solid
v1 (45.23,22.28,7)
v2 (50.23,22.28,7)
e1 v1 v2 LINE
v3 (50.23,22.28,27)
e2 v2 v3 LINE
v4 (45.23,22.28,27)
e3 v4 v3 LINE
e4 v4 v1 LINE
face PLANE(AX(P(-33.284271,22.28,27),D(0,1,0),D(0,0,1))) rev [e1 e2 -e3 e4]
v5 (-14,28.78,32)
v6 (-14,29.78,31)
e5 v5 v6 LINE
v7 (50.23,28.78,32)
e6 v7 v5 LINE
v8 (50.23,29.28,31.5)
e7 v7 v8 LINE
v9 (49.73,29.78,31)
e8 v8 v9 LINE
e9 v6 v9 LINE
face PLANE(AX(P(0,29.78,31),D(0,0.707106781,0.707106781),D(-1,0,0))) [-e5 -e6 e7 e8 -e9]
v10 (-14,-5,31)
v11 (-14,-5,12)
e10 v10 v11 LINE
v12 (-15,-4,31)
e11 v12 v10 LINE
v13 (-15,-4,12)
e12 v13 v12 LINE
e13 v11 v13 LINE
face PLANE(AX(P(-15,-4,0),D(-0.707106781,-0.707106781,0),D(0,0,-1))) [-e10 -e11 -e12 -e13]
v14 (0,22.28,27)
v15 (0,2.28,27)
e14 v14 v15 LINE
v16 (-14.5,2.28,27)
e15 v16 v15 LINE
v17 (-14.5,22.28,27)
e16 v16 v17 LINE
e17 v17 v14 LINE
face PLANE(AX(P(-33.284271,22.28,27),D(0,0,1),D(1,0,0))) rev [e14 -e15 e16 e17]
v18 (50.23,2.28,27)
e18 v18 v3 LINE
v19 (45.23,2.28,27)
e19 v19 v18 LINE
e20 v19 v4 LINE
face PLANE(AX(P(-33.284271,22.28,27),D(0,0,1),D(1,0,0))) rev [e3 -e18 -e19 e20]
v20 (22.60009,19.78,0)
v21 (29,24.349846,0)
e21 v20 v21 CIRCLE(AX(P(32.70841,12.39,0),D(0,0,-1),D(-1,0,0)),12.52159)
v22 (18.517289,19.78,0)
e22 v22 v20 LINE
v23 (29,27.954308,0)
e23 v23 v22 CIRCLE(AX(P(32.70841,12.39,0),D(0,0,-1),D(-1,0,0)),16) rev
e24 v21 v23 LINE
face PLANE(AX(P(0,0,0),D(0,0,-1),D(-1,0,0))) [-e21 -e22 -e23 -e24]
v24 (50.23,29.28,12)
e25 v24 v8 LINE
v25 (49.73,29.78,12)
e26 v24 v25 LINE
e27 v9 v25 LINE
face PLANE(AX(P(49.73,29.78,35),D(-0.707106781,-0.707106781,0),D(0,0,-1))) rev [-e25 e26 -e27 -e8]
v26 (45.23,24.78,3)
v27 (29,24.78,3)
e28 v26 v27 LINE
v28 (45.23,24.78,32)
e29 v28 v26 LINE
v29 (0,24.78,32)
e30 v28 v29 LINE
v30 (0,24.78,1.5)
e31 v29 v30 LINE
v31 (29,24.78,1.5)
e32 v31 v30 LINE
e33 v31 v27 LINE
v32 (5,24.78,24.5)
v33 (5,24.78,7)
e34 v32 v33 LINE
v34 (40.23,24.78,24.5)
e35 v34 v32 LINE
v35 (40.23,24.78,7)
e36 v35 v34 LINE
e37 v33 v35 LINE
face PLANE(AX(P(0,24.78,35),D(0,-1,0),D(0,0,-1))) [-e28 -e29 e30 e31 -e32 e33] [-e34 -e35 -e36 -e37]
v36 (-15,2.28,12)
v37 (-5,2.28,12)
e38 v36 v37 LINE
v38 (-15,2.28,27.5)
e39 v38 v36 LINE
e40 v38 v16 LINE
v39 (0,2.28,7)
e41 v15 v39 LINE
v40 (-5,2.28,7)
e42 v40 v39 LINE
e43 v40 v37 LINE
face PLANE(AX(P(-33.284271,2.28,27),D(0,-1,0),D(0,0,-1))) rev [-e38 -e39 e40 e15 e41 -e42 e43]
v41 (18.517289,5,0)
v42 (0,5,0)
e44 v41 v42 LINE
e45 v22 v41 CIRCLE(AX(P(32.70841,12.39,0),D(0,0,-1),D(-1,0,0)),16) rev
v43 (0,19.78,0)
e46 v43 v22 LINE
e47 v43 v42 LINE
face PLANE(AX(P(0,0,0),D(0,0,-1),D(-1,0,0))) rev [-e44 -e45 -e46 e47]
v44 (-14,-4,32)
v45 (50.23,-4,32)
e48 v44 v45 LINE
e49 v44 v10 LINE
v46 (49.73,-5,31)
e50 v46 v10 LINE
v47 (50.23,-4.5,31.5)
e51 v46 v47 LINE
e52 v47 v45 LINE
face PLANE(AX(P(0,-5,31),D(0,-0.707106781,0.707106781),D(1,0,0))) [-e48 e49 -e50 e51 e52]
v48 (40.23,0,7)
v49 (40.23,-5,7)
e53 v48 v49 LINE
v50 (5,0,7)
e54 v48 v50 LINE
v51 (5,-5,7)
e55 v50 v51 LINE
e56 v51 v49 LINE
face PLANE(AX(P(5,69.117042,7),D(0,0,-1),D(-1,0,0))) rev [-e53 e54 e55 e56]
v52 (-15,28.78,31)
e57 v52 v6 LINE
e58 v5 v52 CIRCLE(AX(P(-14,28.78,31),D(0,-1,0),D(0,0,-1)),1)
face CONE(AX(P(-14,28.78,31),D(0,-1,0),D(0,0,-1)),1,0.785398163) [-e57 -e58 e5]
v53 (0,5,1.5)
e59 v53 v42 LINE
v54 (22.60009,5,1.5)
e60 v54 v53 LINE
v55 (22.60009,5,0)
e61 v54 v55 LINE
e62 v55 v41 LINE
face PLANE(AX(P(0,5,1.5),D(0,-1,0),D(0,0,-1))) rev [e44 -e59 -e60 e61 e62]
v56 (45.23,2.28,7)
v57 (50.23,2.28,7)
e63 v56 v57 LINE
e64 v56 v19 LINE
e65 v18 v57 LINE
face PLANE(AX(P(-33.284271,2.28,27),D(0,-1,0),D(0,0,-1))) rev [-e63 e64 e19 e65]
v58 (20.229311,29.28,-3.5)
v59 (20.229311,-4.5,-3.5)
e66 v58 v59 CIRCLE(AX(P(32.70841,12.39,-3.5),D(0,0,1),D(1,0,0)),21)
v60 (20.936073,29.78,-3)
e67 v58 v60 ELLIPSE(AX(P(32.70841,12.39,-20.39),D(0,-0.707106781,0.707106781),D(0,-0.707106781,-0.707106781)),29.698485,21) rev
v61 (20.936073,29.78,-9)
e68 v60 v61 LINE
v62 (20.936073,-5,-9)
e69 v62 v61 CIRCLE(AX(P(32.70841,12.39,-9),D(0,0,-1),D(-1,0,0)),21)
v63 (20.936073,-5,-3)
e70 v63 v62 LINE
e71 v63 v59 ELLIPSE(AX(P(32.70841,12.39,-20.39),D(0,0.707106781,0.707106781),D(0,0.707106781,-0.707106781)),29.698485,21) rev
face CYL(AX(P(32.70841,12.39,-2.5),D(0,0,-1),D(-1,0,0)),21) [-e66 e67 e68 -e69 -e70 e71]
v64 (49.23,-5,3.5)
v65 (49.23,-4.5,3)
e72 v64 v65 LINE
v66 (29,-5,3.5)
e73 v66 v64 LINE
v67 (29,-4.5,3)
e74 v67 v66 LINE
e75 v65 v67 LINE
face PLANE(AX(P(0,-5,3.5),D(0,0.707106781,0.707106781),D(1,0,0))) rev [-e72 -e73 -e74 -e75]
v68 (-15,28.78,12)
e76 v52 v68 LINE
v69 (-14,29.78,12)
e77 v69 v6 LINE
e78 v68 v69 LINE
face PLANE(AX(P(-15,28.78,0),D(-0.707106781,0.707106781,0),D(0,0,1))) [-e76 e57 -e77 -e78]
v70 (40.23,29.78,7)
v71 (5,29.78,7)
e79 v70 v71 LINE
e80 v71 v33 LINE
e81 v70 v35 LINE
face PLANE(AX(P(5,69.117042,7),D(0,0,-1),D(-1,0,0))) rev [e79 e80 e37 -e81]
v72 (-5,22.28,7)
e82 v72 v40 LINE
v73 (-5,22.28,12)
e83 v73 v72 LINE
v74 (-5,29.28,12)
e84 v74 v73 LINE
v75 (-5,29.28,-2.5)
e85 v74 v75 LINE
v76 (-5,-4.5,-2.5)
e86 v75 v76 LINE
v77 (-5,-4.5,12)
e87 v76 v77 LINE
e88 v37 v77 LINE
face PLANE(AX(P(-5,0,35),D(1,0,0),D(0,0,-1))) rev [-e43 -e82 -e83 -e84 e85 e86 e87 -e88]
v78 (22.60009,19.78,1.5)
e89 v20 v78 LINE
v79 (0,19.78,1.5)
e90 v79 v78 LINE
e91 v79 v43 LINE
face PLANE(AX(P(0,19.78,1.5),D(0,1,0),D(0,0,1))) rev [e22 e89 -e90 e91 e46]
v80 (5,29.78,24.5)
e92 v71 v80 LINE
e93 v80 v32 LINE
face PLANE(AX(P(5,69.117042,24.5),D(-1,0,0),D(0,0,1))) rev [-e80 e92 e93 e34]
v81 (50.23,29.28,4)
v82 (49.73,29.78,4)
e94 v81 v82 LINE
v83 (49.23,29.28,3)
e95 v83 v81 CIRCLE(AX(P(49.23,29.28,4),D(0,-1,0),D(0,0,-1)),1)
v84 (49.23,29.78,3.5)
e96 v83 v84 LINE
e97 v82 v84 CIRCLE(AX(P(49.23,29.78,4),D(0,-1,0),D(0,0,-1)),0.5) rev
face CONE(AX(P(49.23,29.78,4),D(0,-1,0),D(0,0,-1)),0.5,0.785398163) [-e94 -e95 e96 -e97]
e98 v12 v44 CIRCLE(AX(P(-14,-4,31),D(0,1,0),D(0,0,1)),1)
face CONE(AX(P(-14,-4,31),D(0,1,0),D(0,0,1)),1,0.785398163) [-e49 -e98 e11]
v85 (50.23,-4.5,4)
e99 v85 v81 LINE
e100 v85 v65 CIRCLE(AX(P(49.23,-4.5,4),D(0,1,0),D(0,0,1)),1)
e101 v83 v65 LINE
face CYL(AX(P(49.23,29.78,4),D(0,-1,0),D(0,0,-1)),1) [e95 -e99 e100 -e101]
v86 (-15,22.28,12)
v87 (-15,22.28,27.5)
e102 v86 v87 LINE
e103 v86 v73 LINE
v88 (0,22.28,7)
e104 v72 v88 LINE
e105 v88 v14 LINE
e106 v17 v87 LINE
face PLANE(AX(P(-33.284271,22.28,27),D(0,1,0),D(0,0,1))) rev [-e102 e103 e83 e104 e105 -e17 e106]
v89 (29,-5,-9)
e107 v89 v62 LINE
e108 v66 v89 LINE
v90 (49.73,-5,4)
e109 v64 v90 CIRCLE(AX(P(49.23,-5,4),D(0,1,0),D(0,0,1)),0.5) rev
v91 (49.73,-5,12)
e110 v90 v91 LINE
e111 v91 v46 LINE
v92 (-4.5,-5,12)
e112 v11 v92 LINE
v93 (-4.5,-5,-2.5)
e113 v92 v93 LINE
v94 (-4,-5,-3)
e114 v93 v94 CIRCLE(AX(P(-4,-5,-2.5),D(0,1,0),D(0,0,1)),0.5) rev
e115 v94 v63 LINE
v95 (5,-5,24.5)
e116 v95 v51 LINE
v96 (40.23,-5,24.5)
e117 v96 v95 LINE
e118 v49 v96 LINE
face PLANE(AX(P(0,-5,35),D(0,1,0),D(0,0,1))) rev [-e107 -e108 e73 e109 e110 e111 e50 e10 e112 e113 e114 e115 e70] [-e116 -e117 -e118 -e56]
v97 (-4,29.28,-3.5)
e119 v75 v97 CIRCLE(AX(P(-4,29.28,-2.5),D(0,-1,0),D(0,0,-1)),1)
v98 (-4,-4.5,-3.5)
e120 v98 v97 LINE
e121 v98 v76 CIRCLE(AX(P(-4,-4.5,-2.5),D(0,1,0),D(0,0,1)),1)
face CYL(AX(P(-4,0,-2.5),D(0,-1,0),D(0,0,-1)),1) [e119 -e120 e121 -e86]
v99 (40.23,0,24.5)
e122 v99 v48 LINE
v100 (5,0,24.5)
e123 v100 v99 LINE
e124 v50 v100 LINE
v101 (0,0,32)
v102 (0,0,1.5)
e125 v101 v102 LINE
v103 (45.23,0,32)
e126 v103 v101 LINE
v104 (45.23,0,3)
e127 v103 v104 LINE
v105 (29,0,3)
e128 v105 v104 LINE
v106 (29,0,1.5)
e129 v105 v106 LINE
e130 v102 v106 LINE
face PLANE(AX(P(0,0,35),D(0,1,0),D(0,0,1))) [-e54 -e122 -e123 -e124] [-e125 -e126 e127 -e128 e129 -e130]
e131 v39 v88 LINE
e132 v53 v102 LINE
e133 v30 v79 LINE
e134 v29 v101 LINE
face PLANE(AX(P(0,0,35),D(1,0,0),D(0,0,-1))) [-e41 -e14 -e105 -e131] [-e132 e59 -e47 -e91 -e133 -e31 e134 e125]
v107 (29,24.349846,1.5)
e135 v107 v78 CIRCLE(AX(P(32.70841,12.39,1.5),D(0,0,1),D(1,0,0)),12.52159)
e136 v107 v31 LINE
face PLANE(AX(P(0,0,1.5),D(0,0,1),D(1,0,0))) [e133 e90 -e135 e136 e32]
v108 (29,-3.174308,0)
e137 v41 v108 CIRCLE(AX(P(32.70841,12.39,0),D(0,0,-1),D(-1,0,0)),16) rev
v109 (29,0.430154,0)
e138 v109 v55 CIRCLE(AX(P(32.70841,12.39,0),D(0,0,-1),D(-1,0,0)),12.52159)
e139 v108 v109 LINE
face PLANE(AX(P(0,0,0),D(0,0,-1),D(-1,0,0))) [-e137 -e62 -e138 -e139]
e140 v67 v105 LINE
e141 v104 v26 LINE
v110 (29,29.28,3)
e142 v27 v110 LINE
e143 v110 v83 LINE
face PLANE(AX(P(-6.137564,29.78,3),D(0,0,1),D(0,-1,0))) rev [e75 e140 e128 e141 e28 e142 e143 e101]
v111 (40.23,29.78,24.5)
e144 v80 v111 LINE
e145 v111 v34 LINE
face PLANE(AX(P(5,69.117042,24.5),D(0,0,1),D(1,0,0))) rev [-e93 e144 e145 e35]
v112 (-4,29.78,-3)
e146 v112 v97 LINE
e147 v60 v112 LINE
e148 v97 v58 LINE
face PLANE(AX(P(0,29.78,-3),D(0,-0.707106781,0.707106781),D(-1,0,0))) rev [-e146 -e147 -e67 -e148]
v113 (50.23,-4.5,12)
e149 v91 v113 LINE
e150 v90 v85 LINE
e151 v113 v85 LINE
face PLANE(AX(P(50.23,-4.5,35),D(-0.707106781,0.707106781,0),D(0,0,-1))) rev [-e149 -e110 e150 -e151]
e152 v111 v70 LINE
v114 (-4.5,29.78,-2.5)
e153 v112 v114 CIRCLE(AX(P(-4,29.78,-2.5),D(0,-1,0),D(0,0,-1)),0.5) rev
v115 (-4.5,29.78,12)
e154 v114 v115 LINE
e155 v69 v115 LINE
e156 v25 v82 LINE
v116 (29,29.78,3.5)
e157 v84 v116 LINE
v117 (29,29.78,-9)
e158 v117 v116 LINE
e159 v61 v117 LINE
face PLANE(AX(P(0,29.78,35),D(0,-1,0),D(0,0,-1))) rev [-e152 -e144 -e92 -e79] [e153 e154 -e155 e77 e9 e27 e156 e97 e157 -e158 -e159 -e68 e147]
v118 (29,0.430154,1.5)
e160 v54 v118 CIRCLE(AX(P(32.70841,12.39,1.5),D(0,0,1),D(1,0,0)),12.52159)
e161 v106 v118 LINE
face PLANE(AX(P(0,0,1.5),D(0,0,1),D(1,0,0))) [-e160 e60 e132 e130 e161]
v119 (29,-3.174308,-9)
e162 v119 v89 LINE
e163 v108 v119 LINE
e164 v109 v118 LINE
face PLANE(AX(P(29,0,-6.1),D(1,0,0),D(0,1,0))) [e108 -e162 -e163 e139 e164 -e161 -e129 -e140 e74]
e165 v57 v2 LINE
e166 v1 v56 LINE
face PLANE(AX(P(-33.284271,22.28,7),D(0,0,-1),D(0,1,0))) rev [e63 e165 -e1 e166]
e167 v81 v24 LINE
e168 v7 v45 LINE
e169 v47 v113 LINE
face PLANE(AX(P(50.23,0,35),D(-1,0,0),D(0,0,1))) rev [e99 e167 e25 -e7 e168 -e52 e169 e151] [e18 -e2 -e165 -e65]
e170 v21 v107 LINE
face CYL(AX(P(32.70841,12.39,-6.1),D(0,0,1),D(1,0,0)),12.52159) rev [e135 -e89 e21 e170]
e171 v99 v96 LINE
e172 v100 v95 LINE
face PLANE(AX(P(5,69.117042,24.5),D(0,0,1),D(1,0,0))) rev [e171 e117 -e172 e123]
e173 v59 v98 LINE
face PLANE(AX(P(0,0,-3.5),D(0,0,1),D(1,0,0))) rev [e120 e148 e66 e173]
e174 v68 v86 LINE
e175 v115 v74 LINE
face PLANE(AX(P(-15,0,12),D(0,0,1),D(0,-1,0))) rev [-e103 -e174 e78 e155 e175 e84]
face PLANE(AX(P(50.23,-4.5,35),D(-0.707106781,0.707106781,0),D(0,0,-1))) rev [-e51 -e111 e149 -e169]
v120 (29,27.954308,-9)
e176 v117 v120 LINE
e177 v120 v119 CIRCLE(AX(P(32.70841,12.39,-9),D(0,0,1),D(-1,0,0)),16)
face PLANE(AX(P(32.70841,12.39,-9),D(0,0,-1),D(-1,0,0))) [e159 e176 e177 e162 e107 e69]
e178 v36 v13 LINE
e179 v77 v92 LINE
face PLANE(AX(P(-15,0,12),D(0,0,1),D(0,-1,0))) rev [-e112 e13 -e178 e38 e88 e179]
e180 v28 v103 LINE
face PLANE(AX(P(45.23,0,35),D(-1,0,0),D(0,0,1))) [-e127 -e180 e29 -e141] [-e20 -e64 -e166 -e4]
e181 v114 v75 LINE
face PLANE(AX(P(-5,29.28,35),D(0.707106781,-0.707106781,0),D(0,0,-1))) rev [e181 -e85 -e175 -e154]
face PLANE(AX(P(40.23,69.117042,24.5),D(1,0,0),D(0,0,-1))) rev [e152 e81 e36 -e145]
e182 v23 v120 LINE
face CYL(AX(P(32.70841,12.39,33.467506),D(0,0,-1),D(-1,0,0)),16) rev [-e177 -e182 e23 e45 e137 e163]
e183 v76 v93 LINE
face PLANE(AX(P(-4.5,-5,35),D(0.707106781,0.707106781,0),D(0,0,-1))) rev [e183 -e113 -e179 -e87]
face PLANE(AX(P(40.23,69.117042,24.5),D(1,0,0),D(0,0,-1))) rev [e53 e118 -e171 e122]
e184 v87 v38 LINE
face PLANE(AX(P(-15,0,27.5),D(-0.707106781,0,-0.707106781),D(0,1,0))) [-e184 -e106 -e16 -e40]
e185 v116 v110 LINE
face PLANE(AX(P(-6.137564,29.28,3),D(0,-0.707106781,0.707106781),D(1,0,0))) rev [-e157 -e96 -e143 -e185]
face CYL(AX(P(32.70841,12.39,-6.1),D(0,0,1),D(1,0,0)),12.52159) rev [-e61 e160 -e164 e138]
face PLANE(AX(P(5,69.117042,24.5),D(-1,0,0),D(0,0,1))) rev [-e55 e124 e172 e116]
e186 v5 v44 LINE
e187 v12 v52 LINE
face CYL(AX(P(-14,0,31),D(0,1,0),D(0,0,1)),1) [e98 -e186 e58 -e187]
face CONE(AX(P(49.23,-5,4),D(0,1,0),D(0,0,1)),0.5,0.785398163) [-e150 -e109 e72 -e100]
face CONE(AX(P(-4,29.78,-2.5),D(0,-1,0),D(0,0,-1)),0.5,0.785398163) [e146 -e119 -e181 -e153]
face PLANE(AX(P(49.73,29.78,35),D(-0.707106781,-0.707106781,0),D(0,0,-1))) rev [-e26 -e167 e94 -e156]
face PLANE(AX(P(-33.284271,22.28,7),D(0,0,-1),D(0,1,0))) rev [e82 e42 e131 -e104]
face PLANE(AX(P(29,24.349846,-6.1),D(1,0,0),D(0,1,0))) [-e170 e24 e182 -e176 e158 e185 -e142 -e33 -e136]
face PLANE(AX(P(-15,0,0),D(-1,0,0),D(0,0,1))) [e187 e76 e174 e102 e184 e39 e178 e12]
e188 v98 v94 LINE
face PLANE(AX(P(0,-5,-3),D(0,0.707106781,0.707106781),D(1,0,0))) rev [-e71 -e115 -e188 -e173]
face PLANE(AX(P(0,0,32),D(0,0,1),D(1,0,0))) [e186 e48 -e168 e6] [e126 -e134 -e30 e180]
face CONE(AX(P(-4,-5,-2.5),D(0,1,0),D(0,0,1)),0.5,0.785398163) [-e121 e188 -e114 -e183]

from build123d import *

# Parameters (mm, degrees)
SKETCH_1_W              = 45.23
SKETCH_1_H              = 24.78
EXTRUDE_1_DEPTH         = 35
CUT_EXTRUDE_1_DEPTH     = 3
SKETCH_5_W              = 1.897849624
SKETCH_5_H              = 24.78
CUT_EXTRUDE_3_DEPTH     = 3
EXTRUDE_2_DEPTH         = 17.9
EXTRUDE_2_DEPTH_BACK    = 18.6
EXTRUDE_2_START         = 17.5
SKETCH_3_R              = 3
SKETCH_4_W              = 30.897849624
SKETCH_4_H              = 5
CUT_EXTRUDE_2_DEPTH     = 1.5
SKETCH_6_W              = 10
SKETCH_6_H              = 18
CUT_EXTRUDE_4_DEPTH     = 1.5
SHELL_START             = -5
SHELL_12_DEPTH          = 5
SHELL_START_2           = 45.23
SHELL_12_2_OUTLINE_W    = 34.78
SHELL_12_2_OUTLINE_H    = 39
SHELL_12_2_DEPTH        = 5
SHELL_12_3_OUTLINE_W    = 34.78
SHELL_12_3_OUTLINE_H    = 1.5
SHELL_12_3_DEPTH        = 34
SHELL_12_4_OUTLINE_W    = 28
SHELL_12_4_OUTLINE_H    = 1.5
SHELL_12_4_DEPTH        = 20
SHELL_12_5_OUTLINE_W    = 45.23
SHELL_12_5_OUTLINE_H    = 39
SHELL_12_5_DEPTH        = 34.78
SHELL_START_3           = 3
SHELL_12_6_OUTLINE_W    = 45.23
SHELL_12_6_OUTLINE_H    = 24.78
SHELL_12_6_DEPTH        = 29
SHELL_START_4           = 1.5
SHELL_12_7_OUTLINE_R    = 3
SHELL_12_7_DEPTH        = 32
SHELL_12_8_OUTLINE_R    = 3
SHELL_12_8_OUTLINE_W    = 10
SHELL_12_8_OUTLINE_H    = 14.78
SHELL_12_8_DEPTH        = 35
SHELL_12_9_OUTLINE_W    = 5
SHELL_12_9_OUTLINE_H    = 14.78
SHELL_12_9_DEPTH        = 1.5
SHELL_START_5           = 33.5
SHELL_12_10_OUTLINE_W   = 10
SHELL_12_10_OUTLINE_H   = 1.585
SHELL_12_10_OUTLINE_H_2 = 1.635
SHELL_12_10_DEPTH       = 1.5
SHELL_START_6           = -1.1
SHELL_12_11_OUTLINE_R   = 3
SHELL_12_11_DEPTH       = 36.5
SHELL_START_7           = 37
SHELL_12_12_OUTLINE_R   = 8
SHELL_12_12_DEPTH       = 3.4
SHELL_START_8           = -6.1
SHELL_12_13_OUTLINE_R   = 8
SHELL_12_13_DEPTH       = 4.1
CUT_EXTRUDE_7_DEPTH     = 70.724538722
CUT_EXTRUDE_8_DEPTH     = 70.724538722
CUT_EXTRUDE_9_REACH     = 70.969
SKETCH_14_W             = 35.23
SKETCH_14_H             = 17.5
CUT_EXTRUDE_10_REACH    = 72.436
SKETCH_15_W             = 20
SKETCH_15_H             = 20
SKETCH_16_W             = 5
SKETCH_16_H             = 1.5
CUT_EXTRUDE_11_DEPTH    = 34.78
CUT_EXTRUDE_12_REACH    = 72.436
SKETCH_17_W             = 5
SKETCH_17_H             = 34.78
SKETCH_19_W             = 34
SKETCH_19_H             = 1.5
CUT_EXTRUDE_14_DEPTH    = 24.78
FILLET_3_R              = 1
EXTRUDE_3_DEPTH         = 10
EXTRUDE_4_DEPTH         = 10
FILLET_4_R              = 1
CHAMFER_3_SIZE          = 1
CHAMFER_4_SIZE          = 0.5
CUT_EXTRUDE_15_DEPTH    = 10
CHAMFER_5_SIZE          = 0.5
CUT_EXTRUDE_START       = -3.5
CUT_EXTRUDE_16_DEPTH    = 3.5
EXTRUDE_5_DEPTH         = 5.5
EXTRUDE_5_DEPTH_BACK    = 1


with BuildPart() as part:
    # 草图1 → 凸台-拉伸1 (new body)
    with BuildSketch(Plane.XY):
        with Locations((22.615, 12.39)):
            Rectangle(SKETCH_1_W, SKETCH_1_H)
    extrude(amount=EXTRUDE_1_DEPTH)

    # 草图2 → 切除-拉伸1 (cut)
    with BuildSketch(Plane.XY):
        with BuildLine():
            Line((45.23, 24.78), (30.897849624, 24.78))
            ThreePointArc((30.897849624, 24.78), (20.186819111, 12.39), (30.897849624, 0))
            Line((30.897849624, 0), (45.23, 0))
            Line((45.23, 0), (45.23, 24.78))
        make_face()
    cut_extrude_1 = extrude(amount=CUT_EXTRUDE_1_DEPTH, mode=Mode.SUBTRACT)

    # 草图5 → 切除-拉伸3 (cut)
    with BuildSketch(Plane.XY):
        with Locations((29.948924812, 12.39)):
            Rectangle(SKETCH_5_W, SKETCH_5_H)
    cut_extrude_3 = extrude(amount=CUT_EXTRUDE_3_DEPTH, mode=Mode.SUBTRACT)

    # 镜向1: 切除-拉伸1, 切除-拉伸3 across plane
    add(cut_extrude_1.mirror(Plane.XY.offset(17.5)), mode=Mode.SUBTRACT)
    add(cut_extrude_3.mirror(Plane.XY.offset(17.5)), mode=Mode.SUBTRACT)

    # 草图3 → 凸台-拉伸2 (add, two sides: drawn at the far end of the back side and taken through both)
    with BuildSketch(Plane.XY.offset(EXTRUDE_2_START - EXTRUDE_2_DEPTH_BACK)):
        with Locations((32.708409555, 12.39)):
            Circle(SKETCH_3_R)
    extrude(amount=EXTRUDE_2_DEPTH + EXTRUDE_2_DEPTH_BACK)

    # 草图4 → 切除-拉伸2 (cut)
    with BuildSketch(Plane.XY):
        with Locations((15.448924812, 22.28)):
            Rectangle(SKETCH_4_W, SKETCH_4_H)
        with Locations((15.448924812, 2.5)):
            Rectangle(SKETCH_4_W, SKETCH_4_H)
    extrude(amount=CUT_EXTRUDE_2_DEPTH, mode=Mode.SUBTRACT)

    # 草图6 → 切除-拉伸4 (cut)
    with BuildSketch(Plane.XY.offset(35)):
        with BuildLine():
            Line((29, 24.78), (0, 24.78))
            Line((0, 24.78), (0, 0))
            Line((0, 0), (29, 0))
            Line((29, 0), (29, 0.430153603))
            ThreePointArc((29, 0.430153603), (20.186819111, 12.39), (29, 24.349846397))
            Line((29, 24.349846397), (29, 24.78))
        make_face()
        with Locations((10, 12.365)):
            Rectangle(SKETCH_6_W, SKETCH_6_H, mode=Mode.SUBTRACT)
    extrude(amount=-CUT_EXTRUDE_4_DEPTH, mode=Mode.SUBTRACT)

    # 抽壳12: read off the stored shape, not the designer's step
    # 抽壳12 outline → 抽壳12 (add)
    with BuildSketch(Plane.YZ.offset(SHELL_START)):
        Polygon((0, -3.5), (0, -5), (24.78, -5), (24.78, -3.5), (29.78, -3.5), (29.78, 38.5), (-5, 38.5), (-5, -3.5), align=None)
    extrude(amount=SHELL_12_DEPTH)

    # Shell 12 2 outline → Shell 12 2 (add)
    with BuildSketch(Plane.YZ.offset(SHELL_START_2)):
        with Locations((12.39, 17.5)):
            Rectangle(SHELL_12_2_OUTLINE_W, SHELL_12_2_OUTLINE_H)
    extrude(amount=SHELL_12_2_DEPTH)

    # Shell 12 3 outline → Shell 12 3 (add)
    with BuildSketch(Plane.YZ):
        Polygon((0, -3.5), (0, -5), (24.78, -5), (24.78, -3.5), (29.78, -3.5), (29.78, -2), (-5, -2), (-5, -3.5), align=None)
        with Locations((12.39, 37.75)):
            Rectangle(SHELL_12_3_OUTLINE_W, SHELL_12_3_OUTLINE_H)
    extrude(amount=SHELL_12_3_DEPTH)

    # Shell 12 4 outline → Shell 12 4 (add)
    with BuildSketch(Plane.YZ):
        with Locations((12.365, 39.25)):
            Rectangle(SHELL_12_4_OUTLINE_W, SHELL_12_4_OUTLINE_H)
    extrude(amount=SHELL_12_4_DEPTH)

    # Shell 12 5 outline → Shell 12 5 (add)
    with BuildSketch(Plane(origin=(0, 0, 0), x_dir=(1, 0, 0), z_dir=(0, 1, 0)).offset(SHELL_START)):
        with Locations((22.615, -17.5)):
            Rectangle(SHELL_12_5_OUTLINE_W, SHELL_12_5_OUTLINE_H)
    extrude(amount=SHELL_12_5_DEPTH)

    # Shell 12 6 outline → Shell 12 6 (cut)
    with BuildSketch(Plane.XY.offset(SHELL_START_3)):
        with Locations((22.615, 12.39)):
            Rectangle(SHELL_12_6_OUTLINE_W, SHELL_12_6_OUTLINE_H)
    extrude(amount=SHELL_12_6_DEPTH, mode=Mode.SUBTRACT)

    # Shell 12 7 outline → Shell 12 7 (cut)
    with BuildSketch(Plane.XY.offset(SHELL_START_4)):
        with Locations((32.708409555, 12.39)):
            Circle(SHELL_12_7_OUTLINE_R)
        with BuildLine():
            Line((29, 24.349846397), (29, 24.78))
            Line((29, 24.78), (0, 24.78))
            Line((0, 24.78), (0, 0))
            Line((0, 0), (29, 0))
            Line((29, 0), (29, 0.430153603))
            ThreePointArc((29, 0.430153603), (20.186819111, 12.39), (29, 24.349846397))
        make_face()
    extrude(amount=SHELL_12_7_DEPTH, mode=Mode.SUBTRACT)

    # Shell 12 8 outline → Shell 12 8 (cut)
    with BuildSketch(Plane.XY):
        with Locations((32.708409555, 12.39)):
            Circle(SHELL_12_8_OUTLINE_R)
        with Locations((10, 12.39)):
            Rectangle(SHELL_12_8_OUTLINE_W, SHELL_12_8_OUTLINE_H)
    extrude(amount=SHELL_12_8_DEPTH, mode=Mode.SUBTRACT)

    # Shell 12 9 outline → Shell 12 9 (cut)
    with BuildSketch(Plane.XY):
        with Locations((2.5, 12.39)):
            Rectangle(SHELL_12_9_OUTLINE_W, SHELL_12_9_OUTLINE_H)
        with BuildLine():
            ThreePointArc((22.60008985, 5), (20.186819111, 12.39), (22.60008985, 19.78))
            Line((22.60008985, 19.78), (15, 19.78))
            Line((15, 19.78), (15, 5))
            Line((15, 5), (22.60008985, 5))
        make_face()
    extrude(amount=SHELL_12_9_DEPTH, mode=Mode.SUBTRACT)

    # Shell 12 10 outline → Shell 12 10 (cut)
    with BuildSketch(Plane.XY.offset(SHELL_START_5)):
        with Locations((10, 20.5725)):
            Rectangle(SHELL_12_10_OUTLINE_W, SHELL_12_10_OUTLINE_H)
        with Locations((10, 4.1825)):
            Rectangle(SHELL_12_10_OUTLINE_W, SHELL_12_10_OUTLINE_H_2)
    extrude(amount=SHELL_12_10_DEPTH, mode=Mode.SUBTRACT)

    # Shell 12 11 outline → Shell 12 11 (cut)
    with BuildSketch(Plane.XY.offset(SHELL_START_6)):
        with Locations((32.708409555, 12.39)):
            Circle(SHELL_12_11_OUTLINE_R)
    extrude(amount=SHELL_12_11_DEPTH, mode=Mode.SUBTRACT)

    # Shell 12 12 outline → Shell 12 12 (add)
    with BuildSketch(Plane.XY.offset(SHELL_START_7)):
        with Locations((32.708409555, 12.39)):
            Circle(SHELL_12_12_OUTLINE_R)
    extrude(amount=SHELL_12_12_DEPTH)

    # Shell 12 13 outline → Shell 12 13 (add)
    with BuildSketch(Plane.XY.offset(SHELL_START_8)):
        with Locations((32.708409555, 12.39)):
            Circle(SHELL_12_13_OUTLINE_R)
    extrude(amount=SHELL_12_13_DEPTH)

    # 草图12 → 切除-拉伸7 (cut, through all)
    with BuildSketch(Plane(origin=(0, 0, 32), x_dir=(-1, 0, 0), z_dir=(0, 0, -1))):
        Polygon((-50.23, 29.78), (-50.23, -5), (-34, -5), (5, -5), (5, 29.78), (-34, 29.78), align=None)
    extrude(amount=-CUT_EXTRUDE_7_DEPTH, mode=Mode.SUBTRACT)

    # 草图13 → 切除-拉伸8 (cut, through all)
    with BuildSketch(Plane(origin=(0, 0, 32), x_dir=(-1, 0, 0), z_dir=(0, 0, -1))):
        with BuildLine():
            Line((-45.23, 0), (-29, 0))
            Line((-29, 0), (-29, 0.430153603))
            ThreePointArc((-29, 0.430153603), (-20.186819111, 12.39), (-29, 24.349846397))
            Line((-29, 24.349846397), (-29, 24.78))
            Line((-29, 24.78), (-45.23, 24.78))
            Line((-45.23, 24.78), (-45.23, 0))
        make_face()
    extrude(amount=CUT_EXTRUDE_8_DEPTH, mode=Mode.SUBTRACT)

    # 切除-拉伸9: up to this face of the body (flat: up to its plane)
    cut_extrude_9_end = Plane(part.part.faces().sort_by_distance((22.369830038, 29.78, 14.463737915))[0])
    # 草图14 → 切除-拉伸9 (cut, up to the picked face)
    with BuildSketch(Plane.XZ.offset(5), mode=Mode.PRIVATE) as cut_extrude_9_sk1:
        with Locations((22.615, 15.75)):
            Rectangle(SKETCH_14_W, SKETCH_14_H)
    cut_extrude_9_tool1 = split(extrude(cut_extrude_9_sk1.sketch, amount=-CUT_EXTRUDE_9_REACH, mode=Mode.PRIVATE), bisect_by=cut_extrude_9_end, keep=Keep.BOTH, mode=Mode.PRIVATE)
    add(cut_extrude_9_tool1.solids().sort_by(Axis((22.615, -5, 15.75), (0, 1, 0)))[0], mode=Mode.SUBTRACT)

    # 切除-拉伸10: up to this face of the body (flat: up to its plane)
    cut_extrude_10_end = Plane(part.part.faces().sort_by_distance((-5, 12.39, 13.709339078))[0])
    # 草图15 → 切除-拉伸10 (cut, up to the picked face)
    with BuildSketch(Plane(origin=(50.23, 0, 0), x_dir=(0, 0, -1), z_dir=(1, 0, 0)), mode=Mode.PRIVATE) as cut_extrude_10_sk1:
        with Locations((-17, 12.28)):
            Rectangle(SKETCH_15_W, SKETCH_15_H)
    cut_extrude_10_tool1 = split(extrude(cut_extrude_10_sk1.sketch, amount=-CUT_EXTRUDE_10_REACH, mode=Mode.PRIVATE), bisect_by=cut_extrude_10_end, keep=Keep.BOTH, mode=Mode.PRIVATE)
    add(cut_extrude_10_tool1.solids().sort_by(Axis((50.23, 12.28, 17), (-1, 0, 0)))[0], mode=Mode.SUBTRACT)

    # 草图16 → 切除-拉伸11 (cut)
    with BuildSketch(Plane.XZ.offset(5)):
        with Locations((31.5, -2.75)):
            Rectangle(SKETCH_16_W, SKETCH_16_H)
    extrude(amount=-CUT_EXTRUDE_11_DEPTH, mode=Mode.SUBTRACT)

    # 切除-拉伸12: up to this face of the body (flat: up to its plane)
    cut_extrude_12_end = Plane(part.part.faces().sort_by_distance((29, -1.762689237, -2.47843834))[0])
    # 草图17 → 切除-拉伸12 (cut, up to the picked face)
    with BuildSketch(Plane(origin=(50.23, 0, 0), x_dir=(0, 0, -1), z_dir=(1, 0, 0)), mode=Mode.PRIVATE) as cut_extrude_12_sk1:
        with Locations((-0.5, 12.39)):
            Rectangle(SKETCH_17_W, SKETCH_17_H)
    cut_extrude_12_tool1 = split(extrude(cut_extrude_12_sk1.sketch, amount=-CUT_EXTRUDE_12_REACH, mode=Mode.PRIVATE), bisect_by=cut_extrude_12_end, keep=Keep.BOTH, mode=Mode.PRIVATE)
    add(cut_extrude_12_tool1.solids().sort_by(Axis((50.23, 12.39, 0.5), (-1, 0, 0)))[0], mode=Mode.SUBTRACT)

    # 草图19 → 切除-拉伸14 (cut)
    with BuildSketch(Plane(origin=(0, 24.78, 0), x_dir=(1, 0, 0), z_dir=(0, 1, 0))):
        with Locations((12, 4.25)):
            Rectangle(SKETCH_19_W, SKETCH_19_H)
    extrude(amount=-CUT_EXTRUDE_14_DEPTH, mode=Mode.SUBTRACT)

    # 圆角3
    fillet_3_edges = [part.edges().sort_by_distance(p)[0] for p in [
        (-5, 12.39, -3.5),
        (50.23, 12.39, 3),
    ]]
    fillet(fillet_3_edges, radius=FILLET_3_R)

    # 草图20 → 凸台-拉伸3 (add)
    with BuildSketch(Plane(origin=(50.23, 0, 0), x_dir=(0, 0, -1), z_dir=(1, 0, 0))):
        Polygon((-12, 22.28), (-12, 29.78), (-32, 29.78), (-32, -5), (-12, -5), (-12, 2.28), (-27, 2.28), (-27, 22.28), align=None)
    extrude(amount=EXTRUDE_3_DEPTH)

    # 草图22 → 凸台-拉伸4 (add)
    with BuildSketch(Plane.ZY.offset(5)):
        Polygon((32, 29.78), (12, 29.78), (12, 22.28), (27, 22.28), (27, 2.28), (12, 2.28), (12, -5), (32, -5), align=None)
    extrude(amount=EXTRUDE_4_DEPTH)

    # 圆角4
    fillet_4_edges = [part.edges().sort_by_distance(p)[0] for p in [
        (60.23, 12.39, 32),
        (-15, 12.39, 32),
    ]]
    fillet(fillet_4_edges, radius=FILLET_4_R)

    # 倒角3
    chamfer_3_edges = [part.edges().sort_by_distance(p)[0] for p in [
        (60.23, 29.78, 21.5),
        (-15, -5, 21.5),
        (-15, 29.78, 21.5),
        (22.615, 29.78, 32),
        (22.615, -5, 32),
        (60.23, -5, 21.5),
    ]]
    chamfer(chamfer_3_edges, length=CHAMFER_3_SIZE - 0.0001)  # a hair under: the kernel refuses the full size

    # 倒角4
    chamfer_4_edges = [part.edges().sort_by_distance(p)[0] for p in [
        (12.5, 29.78, -3.5),
        (39.115, -5, 3),
        (39.115, 29.78, 3),
        (12.5, -5, -3.5),
        (49.937106781, -5, 3.292893219),
        (-4.707106781, -5, -3.207106781),
        (49.937106781, 29.78, 3.292893219),
        (-4.707106781, 29.78, -3.207106781),
        (50.23, -5, 8),
        (50.23, 29.78, 8),
        (60.23, 12.28, 27),
        (-5, 29.78, 4.75),
        (-5, -5, 4.75),
        (-15, 12.28, 27),
    ]]
    chamfer(chamfer_4_edges, length=CHAMFER_4_SIZE)

    # 草图23 → 切除-拉伸15 (cut)
    with BuildSketch(Plane(origin=(50.23, 0, 0), x_dir=(0, 0, -1), z_dir=(1, 0, 0))):
        Polygon((-12, 29.78), (-32, 29.78), (-32, -5.874790902), (-12, -5.874790902), (-12, -4.5), (-12, 2.28), (-12, 22.28), (-12, 29.28), align=None)
    extrude(amount=CUT_EXTRUDE_15_DEPTH, mode=Mode.SUBTRACT)

    # 倒角5
    chamfer_5_edges = [part.edges().sort_by_distance(p)[0] for p in [
        (50.23, -5, 21.50005),
        (50.23, 29.78, 21.50005),
    ]]
    chamfer(chamfer_5_edges, length=CHAMFER_5_SIZE - 0.0001)  # a hair under: the kernel refuses the full size

    # 草图24 → 切除-拉伸16 (cut)
    with BuildSketch(Plane(origin=(0, 0, -3.5), x_dir=(-1, 0, 0), z_dir=(0, 0, -1)).offset(CUT_EXTRUDE_START)):
        with BuildLine():
            Line((-29, 27.954308484), (-29, 24.349846397))
            ThreePointArc((-29, 24.349846397), (-20.186819111, 12.39), (-29, 0.430153603))
            Line((-29, 0.430153603), (-29, -3.174308484))
            ThreePointArc((-29, -3.174308484), (-20.151846473, 2.473714226), (-16.708409555, 12.39))
            ThreePointArc((-16.708409555, 12.39), (-20.151846473, 22.306285774), (-29, 27.954308484))
        make_face()
    extrude(amount=CUT_EXTRUDE_16_DEPTH, mode=Mode.SUBTRACT)

    # 草图25 → 凸台-拉伸5 (add, two sides: drawn at the far end of the back side and taken through both)
    with BuildSketch(Plane(origin=(0, 0, -3.5), x_dir=(-1, 0, 0), z_dir=(0, 0, -1)).offset(-EXTRUDE_5_DEPTH_BACK)):
        with BuildLine():
            Line((-29, 27.954308484), (-29, 29.78))
            Line((-29, 29.78), (-20.936073339, 29.78))
            ThreePointArc((-20.936073339, 29.78), (-11.708409555, 12.39), (-20.936073339, -5))
            Line((-20.936073339, -5), (-29, -5))
            Line((-29, -5), (-29, -3.174308484))
            ThreePointArc((-29, -3.174308484), (-16.708409555, 12.39), (-29, 27.954308484))
        make_face()
    extrude(amount=EXTRUDE_5_DEPTH + EXTRUDE_5_DEPTH_BACK)


solid = part.part
